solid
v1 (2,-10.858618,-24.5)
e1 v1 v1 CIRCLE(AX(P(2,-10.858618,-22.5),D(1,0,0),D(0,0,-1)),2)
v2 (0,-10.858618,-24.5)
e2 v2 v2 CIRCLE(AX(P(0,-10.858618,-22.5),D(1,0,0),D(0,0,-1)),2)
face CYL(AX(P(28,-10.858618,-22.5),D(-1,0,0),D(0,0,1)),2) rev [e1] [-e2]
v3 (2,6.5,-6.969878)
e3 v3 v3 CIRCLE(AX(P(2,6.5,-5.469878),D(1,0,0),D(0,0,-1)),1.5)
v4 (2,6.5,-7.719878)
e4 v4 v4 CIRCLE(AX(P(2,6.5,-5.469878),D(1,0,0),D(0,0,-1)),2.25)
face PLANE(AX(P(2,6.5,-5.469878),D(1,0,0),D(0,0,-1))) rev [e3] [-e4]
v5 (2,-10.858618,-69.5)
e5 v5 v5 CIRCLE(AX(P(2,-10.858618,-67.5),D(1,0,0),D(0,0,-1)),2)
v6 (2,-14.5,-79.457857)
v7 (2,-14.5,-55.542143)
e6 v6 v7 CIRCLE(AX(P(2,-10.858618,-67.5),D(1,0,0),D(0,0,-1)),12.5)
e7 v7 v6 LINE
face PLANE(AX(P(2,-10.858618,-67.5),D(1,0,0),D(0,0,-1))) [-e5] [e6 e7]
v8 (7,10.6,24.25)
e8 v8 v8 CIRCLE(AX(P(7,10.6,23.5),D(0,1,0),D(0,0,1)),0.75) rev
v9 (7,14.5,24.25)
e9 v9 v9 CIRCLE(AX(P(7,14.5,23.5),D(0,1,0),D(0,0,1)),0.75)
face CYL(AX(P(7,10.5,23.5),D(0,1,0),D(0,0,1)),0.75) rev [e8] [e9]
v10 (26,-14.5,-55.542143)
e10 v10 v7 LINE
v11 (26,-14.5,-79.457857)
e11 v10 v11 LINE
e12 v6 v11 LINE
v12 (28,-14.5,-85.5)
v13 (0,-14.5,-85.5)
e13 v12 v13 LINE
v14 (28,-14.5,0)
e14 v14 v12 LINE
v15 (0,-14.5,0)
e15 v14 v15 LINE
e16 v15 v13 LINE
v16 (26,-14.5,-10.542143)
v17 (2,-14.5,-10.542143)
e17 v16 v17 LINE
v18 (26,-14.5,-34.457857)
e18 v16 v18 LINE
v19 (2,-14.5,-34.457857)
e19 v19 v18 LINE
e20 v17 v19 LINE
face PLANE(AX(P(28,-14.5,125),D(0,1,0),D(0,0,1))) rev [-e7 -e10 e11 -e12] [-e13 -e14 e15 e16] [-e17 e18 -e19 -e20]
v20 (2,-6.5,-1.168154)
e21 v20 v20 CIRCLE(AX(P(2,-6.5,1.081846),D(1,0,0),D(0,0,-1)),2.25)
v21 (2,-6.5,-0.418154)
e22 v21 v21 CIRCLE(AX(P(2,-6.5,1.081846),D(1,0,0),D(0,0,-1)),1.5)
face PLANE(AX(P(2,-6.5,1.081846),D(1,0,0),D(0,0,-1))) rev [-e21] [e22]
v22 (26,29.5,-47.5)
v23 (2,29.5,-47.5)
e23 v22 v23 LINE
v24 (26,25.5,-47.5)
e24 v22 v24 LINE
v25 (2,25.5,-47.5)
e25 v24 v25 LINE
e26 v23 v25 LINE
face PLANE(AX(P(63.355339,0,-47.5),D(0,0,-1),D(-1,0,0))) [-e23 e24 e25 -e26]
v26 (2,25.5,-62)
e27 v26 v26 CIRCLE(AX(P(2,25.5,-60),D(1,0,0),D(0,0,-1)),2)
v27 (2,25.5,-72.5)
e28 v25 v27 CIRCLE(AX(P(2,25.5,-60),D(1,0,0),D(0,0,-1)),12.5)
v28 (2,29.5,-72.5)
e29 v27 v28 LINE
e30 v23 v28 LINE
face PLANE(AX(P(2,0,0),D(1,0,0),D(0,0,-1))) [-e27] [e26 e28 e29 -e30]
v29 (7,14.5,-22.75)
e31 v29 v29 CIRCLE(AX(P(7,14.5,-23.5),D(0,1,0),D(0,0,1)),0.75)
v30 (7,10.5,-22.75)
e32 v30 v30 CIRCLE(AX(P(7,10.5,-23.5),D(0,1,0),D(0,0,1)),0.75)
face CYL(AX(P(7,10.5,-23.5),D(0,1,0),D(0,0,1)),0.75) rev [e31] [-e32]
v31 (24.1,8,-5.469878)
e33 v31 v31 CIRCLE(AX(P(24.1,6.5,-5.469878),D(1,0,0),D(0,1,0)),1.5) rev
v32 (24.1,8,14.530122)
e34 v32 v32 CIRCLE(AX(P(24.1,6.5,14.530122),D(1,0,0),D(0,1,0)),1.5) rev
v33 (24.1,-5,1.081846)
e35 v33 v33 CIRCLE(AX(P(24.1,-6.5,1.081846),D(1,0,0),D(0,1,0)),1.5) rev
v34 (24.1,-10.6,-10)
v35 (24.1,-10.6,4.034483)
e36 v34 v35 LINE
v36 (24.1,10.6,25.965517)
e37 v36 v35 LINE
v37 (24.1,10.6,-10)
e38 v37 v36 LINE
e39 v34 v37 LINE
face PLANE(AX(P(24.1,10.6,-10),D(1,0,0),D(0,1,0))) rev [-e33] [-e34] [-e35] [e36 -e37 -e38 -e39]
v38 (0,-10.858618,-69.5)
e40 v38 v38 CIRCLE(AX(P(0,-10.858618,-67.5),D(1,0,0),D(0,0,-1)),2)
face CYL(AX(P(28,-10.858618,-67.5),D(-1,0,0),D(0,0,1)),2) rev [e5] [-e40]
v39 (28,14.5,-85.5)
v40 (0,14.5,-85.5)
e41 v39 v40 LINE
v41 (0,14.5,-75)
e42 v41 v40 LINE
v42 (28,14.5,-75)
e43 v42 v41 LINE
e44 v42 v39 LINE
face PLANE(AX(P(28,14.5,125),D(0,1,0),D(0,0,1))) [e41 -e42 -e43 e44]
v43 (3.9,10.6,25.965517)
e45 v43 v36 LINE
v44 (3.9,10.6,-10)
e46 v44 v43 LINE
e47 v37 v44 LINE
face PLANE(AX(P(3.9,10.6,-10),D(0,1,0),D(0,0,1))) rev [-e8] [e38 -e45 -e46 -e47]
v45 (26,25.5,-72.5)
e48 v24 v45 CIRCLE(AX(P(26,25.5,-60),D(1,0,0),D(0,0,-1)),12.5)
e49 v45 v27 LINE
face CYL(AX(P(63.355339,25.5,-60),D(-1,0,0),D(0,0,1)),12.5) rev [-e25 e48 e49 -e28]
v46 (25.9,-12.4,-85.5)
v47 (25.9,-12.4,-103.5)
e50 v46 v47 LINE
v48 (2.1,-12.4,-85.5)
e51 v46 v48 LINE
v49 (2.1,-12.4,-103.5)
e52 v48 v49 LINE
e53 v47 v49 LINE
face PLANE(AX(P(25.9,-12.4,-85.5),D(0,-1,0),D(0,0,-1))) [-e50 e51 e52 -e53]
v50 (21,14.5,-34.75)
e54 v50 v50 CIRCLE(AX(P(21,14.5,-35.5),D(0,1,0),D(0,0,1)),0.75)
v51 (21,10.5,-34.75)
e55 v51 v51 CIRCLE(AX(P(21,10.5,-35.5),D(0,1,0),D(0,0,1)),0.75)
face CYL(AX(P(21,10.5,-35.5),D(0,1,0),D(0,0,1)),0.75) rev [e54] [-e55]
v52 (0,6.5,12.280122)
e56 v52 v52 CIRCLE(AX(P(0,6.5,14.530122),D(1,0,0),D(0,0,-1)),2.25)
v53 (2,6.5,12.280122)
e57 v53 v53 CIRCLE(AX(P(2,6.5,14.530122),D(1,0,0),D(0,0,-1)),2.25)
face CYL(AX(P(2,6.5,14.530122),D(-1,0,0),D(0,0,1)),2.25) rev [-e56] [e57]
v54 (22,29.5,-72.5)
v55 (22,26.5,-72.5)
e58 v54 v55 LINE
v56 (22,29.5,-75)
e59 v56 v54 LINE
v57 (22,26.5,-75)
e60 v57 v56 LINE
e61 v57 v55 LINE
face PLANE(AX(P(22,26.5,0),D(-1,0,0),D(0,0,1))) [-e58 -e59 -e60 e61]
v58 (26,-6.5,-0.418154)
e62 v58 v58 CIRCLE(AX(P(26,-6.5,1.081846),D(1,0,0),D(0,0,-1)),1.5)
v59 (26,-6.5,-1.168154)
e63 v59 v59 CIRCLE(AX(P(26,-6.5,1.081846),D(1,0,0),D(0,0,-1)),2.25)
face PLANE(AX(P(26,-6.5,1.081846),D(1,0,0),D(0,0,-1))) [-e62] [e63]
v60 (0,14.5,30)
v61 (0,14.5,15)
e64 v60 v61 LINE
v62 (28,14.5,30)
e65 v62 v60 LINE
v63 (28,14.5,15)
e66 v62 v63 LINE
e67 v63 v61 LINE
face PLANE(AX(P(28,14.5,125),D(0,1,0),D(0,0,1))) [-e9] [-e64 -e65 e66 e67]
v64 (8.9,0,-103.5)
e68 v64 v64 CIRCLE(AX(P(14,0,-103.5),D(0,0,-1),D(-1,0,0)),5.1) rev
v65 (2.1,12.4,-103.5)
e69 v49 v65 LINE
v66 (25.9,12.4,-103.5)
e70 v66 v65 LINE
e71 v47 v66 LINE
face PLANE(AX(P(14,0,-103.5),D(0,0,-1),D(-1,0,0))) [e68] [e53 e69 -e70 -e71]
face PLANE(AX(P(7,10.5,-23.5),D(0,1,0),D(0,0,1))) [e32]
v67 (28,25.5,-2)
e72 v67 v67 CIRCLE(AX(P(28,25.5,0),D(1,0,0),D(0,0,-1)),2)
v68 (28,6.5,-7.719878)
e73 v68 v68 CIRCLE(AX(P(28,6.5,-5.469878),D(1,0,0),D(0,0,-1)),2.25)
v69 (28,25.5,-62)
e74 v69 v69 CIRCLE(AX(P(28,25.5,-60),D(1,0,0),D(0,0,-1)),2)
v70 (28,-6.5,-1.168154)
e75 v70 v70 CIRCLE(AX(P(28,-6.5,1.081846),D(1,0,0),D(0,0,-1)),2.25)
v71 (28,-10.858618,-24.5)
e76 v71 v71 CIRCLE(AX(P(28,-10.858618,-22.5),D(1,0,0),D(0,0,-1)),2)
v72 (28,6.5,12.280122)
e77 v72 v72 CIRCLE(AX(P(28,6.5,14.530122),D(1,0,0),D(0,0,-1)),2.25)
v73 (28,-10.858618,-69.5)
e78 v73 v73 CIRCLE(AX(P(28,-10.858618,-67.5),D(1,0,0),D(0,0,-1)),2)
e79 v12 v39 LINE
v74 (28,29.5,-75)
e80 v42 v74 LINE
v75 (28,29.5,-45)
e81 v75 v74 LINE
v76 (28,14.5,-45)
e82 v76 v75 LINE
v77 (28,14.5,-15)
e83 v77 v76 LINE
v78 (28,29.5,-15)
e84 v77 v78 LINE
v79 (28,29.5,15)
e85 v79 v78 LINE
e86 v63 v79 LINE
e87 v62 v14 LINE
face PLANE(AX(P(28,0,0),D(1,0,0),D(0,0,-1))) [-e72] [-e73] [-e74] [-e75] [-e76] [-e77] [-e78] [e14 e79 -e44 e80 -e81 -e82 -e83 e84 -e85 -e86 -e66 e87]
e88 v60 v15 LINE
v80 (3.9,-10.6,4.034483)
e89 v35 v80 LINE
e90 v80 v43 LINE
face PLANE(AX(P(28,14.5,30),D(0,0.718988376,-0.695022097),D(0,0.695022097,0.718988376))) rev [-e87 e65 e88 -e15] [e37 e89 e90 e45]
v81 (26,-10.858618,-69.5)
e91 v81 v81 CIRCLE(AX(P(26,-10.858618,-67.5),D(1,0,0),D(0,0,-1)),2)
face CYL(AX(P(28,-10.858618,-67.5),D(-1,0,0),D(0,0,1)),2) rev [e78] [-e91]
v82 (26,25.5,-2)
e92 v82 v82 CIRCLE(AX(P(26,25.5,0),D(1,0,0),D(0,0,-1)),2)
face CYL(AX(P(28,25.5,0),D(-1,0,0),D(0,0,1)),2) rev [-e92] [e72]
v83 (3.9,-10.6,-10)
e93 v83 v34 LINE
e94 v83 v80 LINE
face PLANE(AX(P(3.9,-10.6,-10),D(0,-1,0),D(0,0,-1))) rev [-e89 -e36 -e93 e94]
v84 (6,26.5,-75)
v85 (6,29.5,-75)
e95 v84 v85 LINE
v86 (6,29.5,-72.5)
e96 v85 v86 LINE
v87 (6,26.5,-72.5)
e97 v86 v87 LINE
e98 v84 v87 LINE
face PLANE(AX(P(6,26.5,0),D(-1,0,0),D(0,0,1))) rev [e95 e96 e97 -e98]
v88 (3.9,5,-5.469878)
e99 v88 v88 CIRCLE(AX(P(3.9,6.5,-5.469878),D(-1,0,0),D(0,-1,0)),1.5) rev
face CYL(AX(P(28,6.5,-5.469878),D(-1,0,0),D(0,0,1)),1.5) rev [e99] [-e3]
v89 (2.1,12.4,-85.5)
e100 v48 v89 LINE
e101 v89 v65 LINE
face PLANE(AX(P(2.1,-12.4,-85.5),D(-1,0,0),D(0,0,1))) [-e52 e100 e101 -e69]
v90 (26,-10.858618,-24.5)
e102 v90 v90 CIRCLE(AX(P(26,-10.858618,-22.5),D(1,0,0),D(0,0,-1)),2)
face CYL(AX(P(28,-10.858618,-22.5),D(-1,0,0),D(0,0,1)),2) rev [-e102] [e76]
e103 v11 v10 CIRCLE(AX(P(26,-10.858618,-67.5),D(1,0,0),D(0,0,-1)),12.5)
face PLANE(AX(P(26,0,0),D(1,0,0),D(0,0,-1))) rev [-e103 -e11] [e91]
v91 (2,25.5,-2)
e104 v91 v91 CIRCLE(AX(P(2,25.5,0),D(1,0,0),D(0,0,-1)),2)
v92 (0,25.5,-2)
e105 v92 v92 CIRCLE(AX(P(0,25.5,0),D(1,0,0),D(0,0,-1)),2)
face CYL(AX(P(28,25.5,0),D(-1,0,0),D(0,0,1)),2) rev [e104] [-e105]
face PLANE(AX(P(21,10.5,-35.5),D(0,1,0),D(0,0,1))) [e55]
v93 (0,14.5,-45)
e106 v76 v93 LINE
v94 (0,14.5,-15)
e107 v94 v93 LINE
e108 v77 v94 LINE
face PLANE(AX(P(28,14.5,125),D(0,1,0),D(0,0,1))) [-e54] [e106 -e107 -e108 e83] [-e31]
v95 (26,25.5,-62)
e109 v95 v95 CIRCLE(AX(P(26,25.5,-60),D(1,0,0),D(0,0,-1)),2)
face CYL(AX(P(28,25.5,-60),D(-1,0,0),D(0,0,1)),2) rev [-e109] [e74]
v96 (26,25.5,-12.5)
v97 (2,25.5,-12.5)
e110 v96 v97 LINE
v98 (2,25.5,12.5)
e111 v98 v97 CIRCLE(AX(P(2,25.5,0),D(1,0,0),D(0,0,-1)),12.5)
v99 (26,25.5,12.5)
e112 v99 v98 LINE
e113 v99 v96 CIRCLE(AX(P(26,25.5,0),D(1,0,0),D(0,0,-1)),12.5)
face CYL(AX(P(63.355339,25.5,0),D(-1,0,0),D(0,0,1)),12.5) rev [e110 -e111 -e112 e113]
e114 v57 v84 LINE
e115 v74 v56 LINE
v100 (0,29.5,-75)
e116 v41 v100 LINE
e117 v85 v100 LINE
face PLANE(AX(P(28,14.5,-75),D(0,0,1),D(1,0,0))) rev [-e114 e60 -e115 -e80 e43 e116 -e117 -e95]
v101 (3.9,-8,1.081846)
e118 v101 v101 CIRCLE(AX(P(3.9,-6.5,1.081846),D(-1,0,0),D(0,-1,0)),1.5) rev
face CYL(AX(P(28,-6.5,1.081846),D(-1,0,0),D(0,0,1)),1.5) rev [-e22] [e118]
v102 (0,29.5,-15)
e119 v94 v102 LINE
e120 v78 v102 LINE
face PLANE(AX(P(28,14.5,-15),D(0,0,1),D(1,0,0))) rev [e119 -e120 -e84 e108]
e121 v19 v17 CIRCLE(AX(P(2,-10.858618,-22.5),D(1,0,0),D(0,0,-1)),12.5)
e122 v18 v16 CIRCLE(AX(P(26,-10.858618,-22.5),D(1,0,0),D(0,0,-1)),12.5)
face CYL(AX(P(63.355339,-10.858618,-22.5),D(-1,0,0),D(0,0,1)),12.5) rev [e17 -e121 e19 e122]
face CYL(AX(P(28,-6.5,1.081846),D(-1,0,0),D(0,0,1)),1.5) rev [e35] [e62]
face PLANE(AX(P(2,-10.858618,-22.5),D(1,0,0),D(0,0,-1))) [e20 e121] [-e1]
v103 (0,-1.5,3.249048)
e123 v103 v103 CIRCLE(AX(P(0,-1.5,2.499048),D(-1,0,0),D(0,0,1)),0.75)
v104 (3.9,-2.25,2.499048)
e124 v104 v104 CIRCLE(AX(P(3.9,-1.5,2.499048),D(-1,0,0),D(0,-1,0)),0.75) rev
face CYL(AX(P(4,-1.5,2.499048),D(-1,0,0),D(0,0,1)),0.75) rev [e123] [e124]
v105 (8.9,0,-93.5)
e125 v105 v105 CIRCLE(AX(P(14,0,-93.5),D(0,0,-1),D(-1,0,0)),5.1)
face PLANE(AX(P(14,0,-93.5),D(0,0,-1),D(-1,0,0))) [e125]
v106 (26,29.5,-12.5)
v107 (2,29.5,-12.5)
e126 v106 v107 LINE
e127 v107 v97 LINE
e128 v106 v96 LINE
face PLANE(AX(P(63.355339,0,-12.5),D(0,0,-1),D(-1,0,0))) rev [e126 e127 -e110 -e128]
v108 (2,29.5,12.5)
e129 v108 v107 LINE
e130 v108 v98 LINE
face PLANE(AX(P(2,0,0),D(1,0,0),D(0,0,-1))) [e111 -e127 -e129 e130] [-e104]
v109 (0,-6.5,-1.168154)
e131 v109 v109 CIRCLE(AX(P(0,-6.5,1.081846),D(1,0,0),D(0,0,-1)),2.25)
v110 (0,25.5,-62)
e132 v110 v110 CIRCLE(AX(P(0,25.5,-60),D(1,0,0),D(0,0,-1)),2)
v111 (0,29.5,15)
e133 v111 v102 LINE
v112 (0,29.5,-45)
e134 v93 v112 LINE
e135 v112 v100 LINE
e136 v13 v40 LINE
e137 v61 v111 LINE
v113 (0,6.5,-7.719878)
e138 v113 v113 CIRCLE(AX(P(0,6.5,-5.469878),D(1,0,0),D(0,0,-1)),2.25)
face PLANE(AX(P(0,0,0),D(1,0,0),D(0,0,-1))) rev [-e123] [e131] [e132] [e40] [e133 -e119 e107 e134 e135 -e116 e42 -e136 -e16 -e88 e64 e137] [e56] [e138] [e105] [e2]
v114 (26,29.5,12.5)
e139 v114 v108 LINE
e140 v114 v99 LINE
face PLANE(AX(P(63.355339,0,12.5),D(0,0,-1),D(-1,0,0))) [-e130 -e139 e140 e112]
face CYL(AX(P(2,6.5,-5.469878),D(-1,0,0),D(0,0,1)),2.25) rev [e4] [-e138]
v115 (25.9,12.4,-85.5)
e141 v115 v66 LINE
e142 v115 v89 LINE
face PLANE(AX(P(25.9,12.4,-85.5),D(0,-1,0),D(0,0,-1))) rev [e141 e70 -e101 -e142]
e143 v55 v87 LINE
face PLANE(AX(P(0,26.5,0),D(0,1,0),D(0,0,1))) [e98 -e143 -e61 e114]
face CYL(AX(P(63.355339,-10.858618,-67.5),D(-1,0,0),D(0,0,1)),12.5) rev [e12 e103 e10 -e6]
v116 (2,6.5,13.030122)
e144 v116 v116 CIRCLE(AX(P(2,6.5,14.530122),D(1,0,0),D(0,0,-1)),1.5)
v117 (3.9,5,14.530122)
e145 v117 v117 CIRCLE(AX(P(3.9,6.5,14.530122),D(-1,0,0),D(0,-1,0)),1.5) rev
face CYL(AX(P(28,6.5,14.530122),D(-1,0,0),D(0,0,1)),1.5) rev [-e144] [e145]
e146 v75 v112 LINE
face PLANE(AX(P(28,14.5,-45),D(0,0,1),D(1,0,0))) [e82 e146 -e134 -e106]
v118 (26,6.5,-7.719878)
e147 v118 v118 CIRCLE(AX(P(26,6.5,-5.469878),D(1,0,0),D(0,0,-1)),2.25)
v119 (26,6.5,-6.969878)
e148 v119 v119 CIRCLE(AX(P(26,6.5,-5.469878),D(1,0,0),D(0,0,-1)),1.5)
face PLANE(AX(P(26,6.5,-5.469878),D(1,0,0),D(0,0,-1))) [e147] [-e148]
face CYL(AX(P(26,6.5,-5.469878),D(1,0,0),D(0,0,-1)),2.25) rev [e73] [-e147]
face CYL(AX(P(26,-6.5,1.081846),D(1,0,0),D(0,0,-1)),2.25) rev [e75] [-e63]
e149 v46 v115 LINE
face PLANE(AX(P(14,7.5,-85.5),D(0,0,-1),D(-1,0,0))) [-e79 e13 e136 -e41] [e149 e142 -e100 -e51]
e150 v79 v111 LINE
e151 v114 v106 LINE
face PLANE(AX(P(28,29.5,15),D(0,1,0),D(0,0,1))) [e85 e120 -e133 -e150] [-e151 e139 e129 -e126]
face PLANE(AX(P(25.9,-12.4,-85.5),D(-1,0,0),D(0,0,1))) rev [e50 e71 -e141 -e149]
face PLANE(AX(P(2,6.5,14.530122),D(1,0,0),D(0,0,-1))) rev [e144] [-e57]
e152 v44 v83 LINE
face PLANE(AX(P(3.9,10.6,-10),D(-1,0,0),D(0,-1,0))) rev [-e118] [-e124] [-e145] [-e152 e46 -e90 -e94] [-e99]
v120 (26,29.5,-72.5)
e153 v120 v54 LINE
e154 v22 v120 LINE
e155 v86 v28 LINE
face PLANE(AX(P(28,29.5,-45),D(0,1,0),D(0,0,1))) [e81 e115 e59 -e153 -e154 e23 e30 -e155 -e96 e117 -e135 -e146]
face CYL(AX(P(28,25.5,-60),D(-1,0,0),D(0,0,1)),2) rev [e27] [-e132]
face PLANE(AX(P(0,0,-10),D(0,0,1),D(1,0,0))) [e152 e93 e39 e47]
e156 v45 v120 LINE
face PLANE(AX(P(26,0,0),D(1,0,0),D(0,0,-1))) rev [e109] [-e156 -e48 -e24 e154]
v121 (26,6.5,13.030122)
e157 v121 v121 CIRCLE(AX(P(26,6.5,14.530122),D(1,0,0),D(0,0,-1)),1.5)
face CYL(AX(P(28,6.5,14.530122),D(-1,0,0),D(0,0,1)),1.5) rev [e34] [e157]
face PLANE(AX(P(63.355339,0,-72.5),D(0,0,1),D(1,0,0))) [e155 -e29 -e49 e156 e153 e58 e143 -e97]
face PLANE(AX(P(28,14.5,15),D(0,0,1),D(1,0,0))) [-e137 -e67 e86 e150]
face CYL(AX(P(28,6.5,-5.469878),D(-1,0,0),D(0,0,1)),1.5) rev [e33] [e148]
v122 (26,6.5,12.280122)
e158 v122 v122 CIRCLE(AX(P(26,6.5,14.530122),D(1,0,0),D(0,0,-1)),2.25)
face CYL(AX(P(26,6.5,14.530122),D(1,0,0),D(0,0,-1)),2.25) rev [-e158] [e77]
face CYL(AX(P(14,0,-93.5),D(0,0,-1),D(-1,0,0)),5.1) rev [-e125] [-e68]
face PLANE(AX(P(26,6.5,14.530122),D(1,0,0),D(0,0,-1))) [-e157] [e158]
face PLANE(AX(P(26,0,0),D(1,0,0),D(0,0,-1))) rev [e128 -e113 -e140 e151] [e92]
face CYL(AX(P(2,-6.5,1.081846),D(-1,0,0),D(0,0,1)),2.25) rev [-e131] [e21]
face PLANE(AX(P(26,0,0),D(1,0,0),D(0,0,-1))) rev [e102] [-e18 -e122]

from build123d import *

# Parameters (mm, degrees)
SKETCH_1_W           = 250
SKETCH_1_H           = 29
SKETCH_1_W_2         = 30
SKETCH_1_H_2         = 15
EXTRUDE_1_DEPTH      = 28
SKETCH_1_3_R         = 2
CUT_EXTRUDE_1_DEPTH  = 132.450561049
CUT_EXTRUDE_START    = 2
SKETCH_1_5_R         = 2
CUT_EXTRUDE_2_DEPTH  = 24
SKETCH_3_W           = 6
SKETCH_3_H           = 19
EXTRUDE_2_DEPTH      = 35
SKETCH_3_3_W         = 6
SKETCH_3_3_H         = 19
EXTRUDE_3_DEPTH      = 35
SKETCH_1_6_R         = 2
CUT_EXTRUDE_3_DEPTH  = 166.088612569
CUT_EXTRUDE_7_REACH  = 167.089
SKETCH_1_8_R         = 3.1
FILLET_1_R           = 9.5
FILLET_2_R           = 5
SKETCH_4_R           = 5.1
CUT_EXTRUDE_4_DEPTH  = 31.5
SKETCH_4_2_OUTSIDE_W = 87.946
SKETCH_4_2_OUTSIDE_H = 103.946
SKETCH_4_2_OUTSIDE_R = 5.1
CUT_EXTRUDE_5_DEPTH  = 21.5
SKETCH_5_OUTSIDE_W   = 83.722
SKETCH_5_OUTSIDE_H   = 99.722
SKETCH_5_OUTSIDE_W_2 = 23.8
SKETCH_5_OUTSIDE_H_2 = 24.8
CUT_EXTRUDE_6_DEPTH  = 18
SKETCH_6_R           = 0.75
CUT_EXTRUDE_8_DEPTH  = 4
SKETCH_7_R           = 0.75
CUT_EXTRUDE_9_DEPTH  = 4
SKETCH_8_R           = 0.75
CUT_EXTRUDE_10_DEPTH = 4
SKETCH_9_R           = 0.75
CUT_EXTRUDE_11_DEPTH = 4
SKETCH_11_R          = 0.75
CUT_EXTRUDE_12_DEPTH = 166.088612569
CUT_EXTRUDE_13_DEPTH = 166.088612569
CUT_EXTRUDE_START_2  = 30
SKETCH_13_W          = 20.2
SKETCH_13_H          = 21.2
CUT_EXTRUDE_14_DEPTH = 40
SKETCH_11_5_R        = 1.5
CUT_EXTRUDE_18_DEPTH = 112.204766085
SKETCH_11_6_R        = 2.25
CUT_EXTRUDE_19_DEPTH = 2
CUT_EXTRUDE_START_3  = 26
SKETCH_11_7_R        = 2.25
CUT_EXTRUDE_20_DEPTH = 2
SKETCH_15_W          = 16
SKETCH_15_H          = 2.5
SKETCH_15_H_2        = 10
CUT_EXTRUDE_21_DEPTH = 3


with BuildPart() as part:
    # 草图1 → 凸台-拉伸1 (new body)
    with BuildSketch(Plane(origin=(0, 0, 0), x_dir=(0, 0, -1), z_dir=(1, 0, 0))):
        Rectangle(SKETCH_1_W, SKETCH_1_H)
        with Locations((-60, 22)):
            Rectangle(SKETCH_1_W_2, SKETCH_1_H_2)
        with Locations((0, 22)):
            Rectangle(SKETCH_1_W_2, SKETCH_1_H_2)
        with Locations((60, 22)):
            Rectangle(SKETCH_1_W_2, SKETCH_1_H_2)
    extrude(amount=EXTRUDE_1_DEPTH)

    # 草图1<3> → 切除-拉伸1 (cut, through all)
    with BuildSketch(Plane(origin=(0, 0, 0), x_dir=(0, 0, -1), z_dir=(1, 0, 0))):
        with Locations((-67.5, -10.858617882)):
            Circle(SKETCH_1_3_R)
        with Locations((-22.5, -10.858617882)):
            Circle(SKETCH_1_3_R)
        with Locations((22.5, -10.858617882)):
            Circle(SKETCH_1_3_R)
        with Locations((-60, 25.5)):
            Circle(SKETCH_1_3_R)
        with Locations((67.5, -10.858617882)):
            Circle(SKETCH_1_3_R)
        with Locations((0, 25.5)):
            Circle(SKETCH_1_3_R)
        with Locations((60, 25.5)):
            Circle(SKETCH_1_3_R)
    extrude(amount=CUT_EXTRUDE_1_DEPTH, mode=Mode.SUBTRACT)

    # 草图1<5> → 切除-拉伸2 (cut)
    # profile 1 of 7: a face of its own
    with BuildSketch(Plane(origin=(0, 0, 0), x_dir=(0, 0, -1), z_dir=(1, 0, 0)).offset(CUT_EXTRUDE_START)):
        with BuildLine():
            Line((-72.5, 29.5), (-72.5, 25.5))
            ThreePointArc((-72.5, 25.5), (-60, 13), (-47.5, 25.5))
            Line((-47.5, 25.5), (-47.5, 29.5))
            Line((-47.5, 29.5), (-72.5, 29.5))
        make_face()
        with Locations((-60, 25.5)):
            Circle(SKETCH_1_5_R, mode=Mode.SUBTRACT)
    # profile 2 of 7: a face of its own
    with BuildSketch(Plane(origin=(0, 0, 0), x_dir=(0, 0, -1), z_dir=(1, 0, 0)).offset(CUT_EXTRUDE_START)):
        with BuildLine():
            Line((-79.457856675, -14.5), (-55.542143325, -14.5))
            ThreePointArc((-55.542143325, -14.5), (-67.5, 1.641382118), (-79.457856675, -14.5))
        make_face()
        with Locations((-67.5, -10.858617882)):
            Circle(SKETCH_1_5_R, mode=Mode.SUBTRACT)
    # profile 3 of 7: a face of its own
    with BuildSketch(Plane(origin=(0, 0, 0), x_dir=(0, 0, -1), z_dir=(1, 0, 0)).offset(CUT_EXTRUDE_START)):
        with BuildLine():
            Line((-34.457856675, -14.5), (-10.542143325, -14.5))
            ThreePointArc((-10.542143325, -14.5), (-22.5, 1.641382118), (-34.457856675, -14.5))
        make_face()
        with Locations((-22.5, -10.858617882)):
            Circle(SKETCH_1_5_R, mode=Mode.SUBTRACT)
    # profile 4 of 7: a face of its own
    with BuildSketch(Plane(origin=(0, 0, 0), x_dir=(0, 0, -1), z_dir=(1, 0, 0)).offset(CUT_EXTRUDE_START)):
        with BuildLine():
            ThreePointArc((-12.5, 25.5), (0, 13), (12.5, 25.5))
            Line((12.5, 25.5), (12.5, 29.5))
            Line((12.5, 29.5), (-12.5, 29.5))
            Line((-12.5, 29.5), (-12.5, 25.5))
        make_face()
        with Locations((0, 25.5)):
            Circle(SKETCH_1_5_R, mode=Mode.SUBTRACT)
    # profile 5 of 7: a face of its own
    with BuildSketch(Plane(origin=(0, 0, 0), x_dir=(0, 0, -1), z_dir=(1, 0, 0)).offset(CUT_EXTRUDE_START)):
        with BuildLine():
            Line((10.542143325, -14.5), (34.457856675, -14.5))
            ThreePointArc((34.457856675, -14.5), (22.5, 1.641382118), (10.542143325, -14.5))
        make_face()
        with Locations((22.5, -10.858617882)):
            Circle(SKETCH_1_5_R, mode=Mode.SUBTRACT)
    # profile 6 of 7: a face of its own
    with BuildSketch(Plane(origin=(0, 0, 0), x_dir=(0, 0, -1), z_dir=(1, 0, 0)).offset(CUT_EXTRUDE_START)):
        with BuildLine():
            Line((55.542143325, -14.5), (79.457856675, -14.5))
            ThreePointArc((79.457856675, -14.5), (67.5, 1.641382118), (55.542143325, -14.5))
        make_face()
        with Locations((67.5, -10.858617882)):
            Circle(SKETCH_1_5_R, mode=Mode.SUBTRACT)
    # profile 7 of 7: a face of its own
    with BuildSketch(Plane(origin=(0, 0, 0), x_dir=(0, 0, -1), z_dir=(1, 0, 0)).offset(CUT_EXTRUDE_START)):
        with BuildLine():
            ThreePointArc((47.5, 25.5), (60, 13), (72.5, 25.5))
            Line((72.5, 25.5), (72.5, 29.5))
            Line((72.5, 29.5), (47.5, 29.5))
            Line((47.5, 29.5), (47.5, 25.5))
        make_face()
        with Locations((60, 25.5)):
            Circle(SKETCH_1_5_R, mode=Mode.SUBTRACT)
    extrude(amount=CUT_EXTRUDE_2_DEPTH, mode=Mode.SUBTRACT)

    # 草图3 → 凸台-拉伸2 (add)
    with BuildSketch(Plane.XY.offset(125)):
        with Locations((25, 0)):
            Rectangle(SKETCH_3_W, SKETCH_3_H)
    extrude(amount=EXTRUDE_2_DEPTH)

    # 草图3<3> → 凸台-拉伸3 (add)
    with BuildSketch(Plane.XY.offset(125)):
        with Locations((25, 0)):
            Rectangle(SKETCH_3_3_W, SKETCH_3_3_H)
        with Locations((3, 0)):
            Rectangle(SKETCH_3_3_W, SKETCH_3_3_H)
    extrude(amount=EXTRUDE_3_DEPTH)

    # 草图1<6> → 切除-拉伸3 (cut, through all)
    with BuildSketch(Plane(origin=(0, 0, 0), x_dir=(0, 0, -1), z_dir=(1, 0, 0))):
        with Locations(Location((-150, 0, 0), (0, 0, 90))):
            Circle(SKETCH_1_6_R)
    extrude(amount=CUT_EXTRUDE_3_DEPTH, mode=Mode.SUBTRACT)

    # 草图1<8> → 切除-拉伸7 (cut, up to next)
    with BuildSketch(Plane(origin=(0, 0, 0), x_dir=(0, 0, -1), z_dir=(1, 0, 0)), mode=Mode.PRIVATE) as cut_extrude_7_sk1:
        with Locations(Location((-150, 0, 0), (0, 0, 180))):
            Circle(SKETCH_1_8_R)
    cut_extrude_7_tool1 = extrude(cut_extrude_7_sk1.sketch, amount=CUT_EXTRUDE_7_REACH, mode=Mode.PRIVATE) & part.part
    add(cut_extrude_7_tool1.solids().sort_by_distance((0, 0, 150))[0], mode=Mode.SUBTRACT)

    # 圆角1
    fillet_1_edges = [part.edges().sort_by_distance(p)[0] for p in [
        (25, 9.5, 160),
        (25, -9.5, 160),
        (3, -9.5, 160),
        (3, 9.5, 160),
    ]]
    fillet(fillet_1_edges, radius=FILLET_1_R - 0.0001)  # a hair under: the kernel refuses the full size

    # 圆角2
    fillet_2_edges = [part.edges().sort_by_distance(p)[0] for p in [
        (14, -14.5, 125),
        (14, 14.5, 125),
    ]]
    fillet(fillet_2_edges, radius=FILLET_2_R)

    # 草图4 → 切除-拉伸4 (cut)
    with BuildSketch(Plane(origin=(0, 0, -125), x_dir=(-1, 0, 0), z_dir=(0, 0, -1))):
        with Locations((-14, 0)):
            Circle(SKETCH_4_R)
    extrude(amount=-CUT_EXTRUDE_4_DEPTH, mode=Mode.SUBTRACT)

    # 草图4<2> outside → 切除-拉伸5 (cut)
    with BuildSketch(Plane(origin=(0, 0, -125), x_dir=(-1, 0, 0), z_dir=(0, 0, -1))):
        with Locations((-14, 7.5)):
            Rectangle(SKETCH_4_2_OUTSIDE_W, SKETCH_4_2_OUTSIDE_H)
        with Locations((-14, 0)):
            Circle(SKETCH_4_2_OUTSIDE_R, mode=Mode.SUBTRACT)
    extrude(amount=-CUT_EXTRUDE_5_DEPTH, mode=Mode.SUBTRACT)

    # 草图5 outside → 切除-拉伸6 (cut)
    with BuildSketch(Plane(origin=(0, 0, -103.5), x_dir=(-1, 0, 0), z_dir=(0, 0, -1))):
        with Locations((-14, 7.5)):
            Rectangle(SKETCH_5_OUTSIDE_W, SKETCH_5_OUTSIDE_H)
        with Locations((-14, 0)):
            Rectangle(SKETCH_5_OUTSIDE_W_2, SKETCH_5_OUTSIDE_H_2, mode=Mode.SUBTRACT)
    extrude(amount=-CUT_EXTRUDE_6_DEPTH, mode=Mode.SUBTRACT)

    # 草图6 → 切除-拉伸8 (cut)
    with BuildSketch(Plane(origin=(0, 14.5, 0), x_dir=(1, 0, 0), z_dir=(0, 1, 0))):
        with Locations(Location((7, 23.5, 0), (0, 0, 270))):
            Circle(SKETCH_6_R)
        with Locations(Location((21, 35.5, 0), (0, 0, 270))):
            Circle(SKETCH_6_R)
        with Locations(Location((7, -23.5, 0), (0, 0, 270))):
            Circle(SKETCH_6_R)
        with Locations(Location((21, -35.5, 0), (0, 0, 270))):
            Circle(SKETCH_6_R)
    extrude(amount=-CUT_EXTRUDE_8_DEPTH, mode=Mode.SUBTRACT)

    # 草图7 → 切除-拉伸9 (cut)
    with BuildSketch(Plane(origin=(0, 14.5, 0), x_dir=(1, 0, 0), z_dir=(0, 1, 0))):
        with Locations(Location((7, -89.5, 0), (0, 0, 270))):
            Circle(SKETCH_7_R)
        with Locations(Location((21.2, -110.5, 0), (0, 0, 270))):
            Circle(SKETCH_7_R)
    extrude(amount=-CUT_EXTRUDE_9_DEPTH, mode=Mode.SUBTRACT)

    # 草图8 → 切除-拉伸10 (cut)
    with BuildSketch(Plane.ZY):
        with Locations((47, 4)):
            Circle(SKETCH_8_R)
        with Locations((2.499047641, -1.5)):
            Circle(SKETCH_8_R)
    extrude(amount=-CUT_EXTRUDE_10_DEPTH, mode=Mode.SUBTRACT)

    # 草图9 → 切除-拉伸11 (cut)
    with BuildSketch(Plane(origin=(28, 0, 0), x_dir=(0, 0, -1), z_dir=(1, 0, 0))):
        with Locations((-107.5, -0.5)):
            Circle(SKETCH_9_R)
        with Locations((-92.5, -0.5)):
            Circle(SKETCH_9_R)
    extrude(amount=-CUT_EXTRUDE_11_DEPTH, mode=Mode.SUBTRACT)

    # 草图11 → 切除-拉伸12 (cut, through all)
    with BuildSketch(Plane(origin=(0, 0, 0), x_dir=(0, 0, -1), z_dir=(1, 0, 0))):
        with Locations((-14.530122053, 6.5)):
            Circle(SKETCH_11_R)
        with Locations((-1.081846191, -6.5)):
            Circle(SKETCH_11_R)
        with Locations((5.469877947, 6.5)):
            Circle(SKETCH_11_R)
    extrude(amount=CUT_EXTRUDE_12_DEPTH, mode=Mode.SUBTRACT)

    # 草图10 → 切除-拉伸13 (cut, through all)
    with BuildSketch(Plane.ZY):
        Polygon((30, 14.5), (0, -14.5), (0, -65.636075395), (207.45026546, -65.636075395), (207.45026546, 45.542128626), (30, 45.542128626), align=None)
    extrude(amount=-CUT_EXTRUDE_13_DEPTH, mode=Mode.SUBTRACT)

    # 草图13 → 切除-拉伸14 (cut)
    with BuildSketch(Plane.XY.offset(CUT_EXTRUDE_START_2)):
        with Locations((14, 0)):
            Rectangle(SKETCH_13_W, SKETCH_13_H)
    extrude(amount=-CUT_EXTRUDE_14_DEPTH, mode=Mode.SUBTRACT)

    # 草图11<5> → 切除-拉伸18 (cut, through all)
    with BuildSketch(Plane(origin=(0, 0, 0), x_dir=(0, 0, -1), z_dir=(1, 0, 0))):
        with Locations(Location((-14.530122053, 6.5, 0), (0, 0, 90))):
            Circle(SKETCH_11_5_R)
        with Locations(Location((-1.081846191, -6.5, 0), (0, 0, 90))):
            Circle(SKETCH_11_5_R)
        with Locations(Location((5.469877947, 6.5, 0), (0, 0, 90))):
            Circle(SKETCH_11_5_R)
    extrude(amount=CUT_EXTRUDE_18_DEPTH, mode=Mode.SUBTRACT)

    # 草图11<6> → 切除-拉伸19 (cut)
    with BuildSketch(Plane(origin=(0, 0, 0), x_dir=(0, 0, -1), z_dir=(1, 0, 0))):
        with Locations((-14.530122053, 6.5)):
            Circle(SKETCH_11_6_R)
        with Locations((-1.081846191, -6.5)):
            Circle(SKETCH_11_6_R)
        with Locations((5.469877947, 6.5)):
            Circle(SKETCH_11_6_R)
    extrude(amount=CUT_EXTRUDE_19_DEPTH, mode=Mode.SUBTRACT)

    # 草图11<7> → 切除-拉伸20 (cut)
    with BuildSketch(Plane(origin=(0, 0, 0), x_dir=(0, 0, -1), z_dir=(1, 0, 0)).offset(CUT_EXTRUDE_START_3)):
        with Locations((-14.530122053, 6.5)):
            Circle(SKETCH_11_7_R)
        with Locations((-1.081846191, -6.5)):
            Circle(SKETCH_11_7_R)
        with Locations((5.469877947, 6.5)):
            Circle(SKETCH_11_7_R)
    extrude(amount=CUT_EXTRUDE_20_DEPTH, mode=Mode.SUBTRACT)

    # 草图15 → 切除-拉伸21 (cut)
    with BuildSketch(Plane(origin=(0, 29.5, 0), x_dir=(1, 0, 0), z_dir=(0, 1, 0))):
        with Locations((14, 73.75)):
            Rectangle(SKETCH_15_W, SKETCH_15_H)
        with Locations((14, 71.25)):
            Rectangle(SKETCH_15_W, SKETCH_15_H)
        with Locations((14, 65)):
            Rectangle(SKETCH_15_W, SKETCH_15_H_2)
    extrude(amount=-CUT_EXTRUDE_21_DEPTH, mode=Mode.SUBTRACT)


solid = part.part
